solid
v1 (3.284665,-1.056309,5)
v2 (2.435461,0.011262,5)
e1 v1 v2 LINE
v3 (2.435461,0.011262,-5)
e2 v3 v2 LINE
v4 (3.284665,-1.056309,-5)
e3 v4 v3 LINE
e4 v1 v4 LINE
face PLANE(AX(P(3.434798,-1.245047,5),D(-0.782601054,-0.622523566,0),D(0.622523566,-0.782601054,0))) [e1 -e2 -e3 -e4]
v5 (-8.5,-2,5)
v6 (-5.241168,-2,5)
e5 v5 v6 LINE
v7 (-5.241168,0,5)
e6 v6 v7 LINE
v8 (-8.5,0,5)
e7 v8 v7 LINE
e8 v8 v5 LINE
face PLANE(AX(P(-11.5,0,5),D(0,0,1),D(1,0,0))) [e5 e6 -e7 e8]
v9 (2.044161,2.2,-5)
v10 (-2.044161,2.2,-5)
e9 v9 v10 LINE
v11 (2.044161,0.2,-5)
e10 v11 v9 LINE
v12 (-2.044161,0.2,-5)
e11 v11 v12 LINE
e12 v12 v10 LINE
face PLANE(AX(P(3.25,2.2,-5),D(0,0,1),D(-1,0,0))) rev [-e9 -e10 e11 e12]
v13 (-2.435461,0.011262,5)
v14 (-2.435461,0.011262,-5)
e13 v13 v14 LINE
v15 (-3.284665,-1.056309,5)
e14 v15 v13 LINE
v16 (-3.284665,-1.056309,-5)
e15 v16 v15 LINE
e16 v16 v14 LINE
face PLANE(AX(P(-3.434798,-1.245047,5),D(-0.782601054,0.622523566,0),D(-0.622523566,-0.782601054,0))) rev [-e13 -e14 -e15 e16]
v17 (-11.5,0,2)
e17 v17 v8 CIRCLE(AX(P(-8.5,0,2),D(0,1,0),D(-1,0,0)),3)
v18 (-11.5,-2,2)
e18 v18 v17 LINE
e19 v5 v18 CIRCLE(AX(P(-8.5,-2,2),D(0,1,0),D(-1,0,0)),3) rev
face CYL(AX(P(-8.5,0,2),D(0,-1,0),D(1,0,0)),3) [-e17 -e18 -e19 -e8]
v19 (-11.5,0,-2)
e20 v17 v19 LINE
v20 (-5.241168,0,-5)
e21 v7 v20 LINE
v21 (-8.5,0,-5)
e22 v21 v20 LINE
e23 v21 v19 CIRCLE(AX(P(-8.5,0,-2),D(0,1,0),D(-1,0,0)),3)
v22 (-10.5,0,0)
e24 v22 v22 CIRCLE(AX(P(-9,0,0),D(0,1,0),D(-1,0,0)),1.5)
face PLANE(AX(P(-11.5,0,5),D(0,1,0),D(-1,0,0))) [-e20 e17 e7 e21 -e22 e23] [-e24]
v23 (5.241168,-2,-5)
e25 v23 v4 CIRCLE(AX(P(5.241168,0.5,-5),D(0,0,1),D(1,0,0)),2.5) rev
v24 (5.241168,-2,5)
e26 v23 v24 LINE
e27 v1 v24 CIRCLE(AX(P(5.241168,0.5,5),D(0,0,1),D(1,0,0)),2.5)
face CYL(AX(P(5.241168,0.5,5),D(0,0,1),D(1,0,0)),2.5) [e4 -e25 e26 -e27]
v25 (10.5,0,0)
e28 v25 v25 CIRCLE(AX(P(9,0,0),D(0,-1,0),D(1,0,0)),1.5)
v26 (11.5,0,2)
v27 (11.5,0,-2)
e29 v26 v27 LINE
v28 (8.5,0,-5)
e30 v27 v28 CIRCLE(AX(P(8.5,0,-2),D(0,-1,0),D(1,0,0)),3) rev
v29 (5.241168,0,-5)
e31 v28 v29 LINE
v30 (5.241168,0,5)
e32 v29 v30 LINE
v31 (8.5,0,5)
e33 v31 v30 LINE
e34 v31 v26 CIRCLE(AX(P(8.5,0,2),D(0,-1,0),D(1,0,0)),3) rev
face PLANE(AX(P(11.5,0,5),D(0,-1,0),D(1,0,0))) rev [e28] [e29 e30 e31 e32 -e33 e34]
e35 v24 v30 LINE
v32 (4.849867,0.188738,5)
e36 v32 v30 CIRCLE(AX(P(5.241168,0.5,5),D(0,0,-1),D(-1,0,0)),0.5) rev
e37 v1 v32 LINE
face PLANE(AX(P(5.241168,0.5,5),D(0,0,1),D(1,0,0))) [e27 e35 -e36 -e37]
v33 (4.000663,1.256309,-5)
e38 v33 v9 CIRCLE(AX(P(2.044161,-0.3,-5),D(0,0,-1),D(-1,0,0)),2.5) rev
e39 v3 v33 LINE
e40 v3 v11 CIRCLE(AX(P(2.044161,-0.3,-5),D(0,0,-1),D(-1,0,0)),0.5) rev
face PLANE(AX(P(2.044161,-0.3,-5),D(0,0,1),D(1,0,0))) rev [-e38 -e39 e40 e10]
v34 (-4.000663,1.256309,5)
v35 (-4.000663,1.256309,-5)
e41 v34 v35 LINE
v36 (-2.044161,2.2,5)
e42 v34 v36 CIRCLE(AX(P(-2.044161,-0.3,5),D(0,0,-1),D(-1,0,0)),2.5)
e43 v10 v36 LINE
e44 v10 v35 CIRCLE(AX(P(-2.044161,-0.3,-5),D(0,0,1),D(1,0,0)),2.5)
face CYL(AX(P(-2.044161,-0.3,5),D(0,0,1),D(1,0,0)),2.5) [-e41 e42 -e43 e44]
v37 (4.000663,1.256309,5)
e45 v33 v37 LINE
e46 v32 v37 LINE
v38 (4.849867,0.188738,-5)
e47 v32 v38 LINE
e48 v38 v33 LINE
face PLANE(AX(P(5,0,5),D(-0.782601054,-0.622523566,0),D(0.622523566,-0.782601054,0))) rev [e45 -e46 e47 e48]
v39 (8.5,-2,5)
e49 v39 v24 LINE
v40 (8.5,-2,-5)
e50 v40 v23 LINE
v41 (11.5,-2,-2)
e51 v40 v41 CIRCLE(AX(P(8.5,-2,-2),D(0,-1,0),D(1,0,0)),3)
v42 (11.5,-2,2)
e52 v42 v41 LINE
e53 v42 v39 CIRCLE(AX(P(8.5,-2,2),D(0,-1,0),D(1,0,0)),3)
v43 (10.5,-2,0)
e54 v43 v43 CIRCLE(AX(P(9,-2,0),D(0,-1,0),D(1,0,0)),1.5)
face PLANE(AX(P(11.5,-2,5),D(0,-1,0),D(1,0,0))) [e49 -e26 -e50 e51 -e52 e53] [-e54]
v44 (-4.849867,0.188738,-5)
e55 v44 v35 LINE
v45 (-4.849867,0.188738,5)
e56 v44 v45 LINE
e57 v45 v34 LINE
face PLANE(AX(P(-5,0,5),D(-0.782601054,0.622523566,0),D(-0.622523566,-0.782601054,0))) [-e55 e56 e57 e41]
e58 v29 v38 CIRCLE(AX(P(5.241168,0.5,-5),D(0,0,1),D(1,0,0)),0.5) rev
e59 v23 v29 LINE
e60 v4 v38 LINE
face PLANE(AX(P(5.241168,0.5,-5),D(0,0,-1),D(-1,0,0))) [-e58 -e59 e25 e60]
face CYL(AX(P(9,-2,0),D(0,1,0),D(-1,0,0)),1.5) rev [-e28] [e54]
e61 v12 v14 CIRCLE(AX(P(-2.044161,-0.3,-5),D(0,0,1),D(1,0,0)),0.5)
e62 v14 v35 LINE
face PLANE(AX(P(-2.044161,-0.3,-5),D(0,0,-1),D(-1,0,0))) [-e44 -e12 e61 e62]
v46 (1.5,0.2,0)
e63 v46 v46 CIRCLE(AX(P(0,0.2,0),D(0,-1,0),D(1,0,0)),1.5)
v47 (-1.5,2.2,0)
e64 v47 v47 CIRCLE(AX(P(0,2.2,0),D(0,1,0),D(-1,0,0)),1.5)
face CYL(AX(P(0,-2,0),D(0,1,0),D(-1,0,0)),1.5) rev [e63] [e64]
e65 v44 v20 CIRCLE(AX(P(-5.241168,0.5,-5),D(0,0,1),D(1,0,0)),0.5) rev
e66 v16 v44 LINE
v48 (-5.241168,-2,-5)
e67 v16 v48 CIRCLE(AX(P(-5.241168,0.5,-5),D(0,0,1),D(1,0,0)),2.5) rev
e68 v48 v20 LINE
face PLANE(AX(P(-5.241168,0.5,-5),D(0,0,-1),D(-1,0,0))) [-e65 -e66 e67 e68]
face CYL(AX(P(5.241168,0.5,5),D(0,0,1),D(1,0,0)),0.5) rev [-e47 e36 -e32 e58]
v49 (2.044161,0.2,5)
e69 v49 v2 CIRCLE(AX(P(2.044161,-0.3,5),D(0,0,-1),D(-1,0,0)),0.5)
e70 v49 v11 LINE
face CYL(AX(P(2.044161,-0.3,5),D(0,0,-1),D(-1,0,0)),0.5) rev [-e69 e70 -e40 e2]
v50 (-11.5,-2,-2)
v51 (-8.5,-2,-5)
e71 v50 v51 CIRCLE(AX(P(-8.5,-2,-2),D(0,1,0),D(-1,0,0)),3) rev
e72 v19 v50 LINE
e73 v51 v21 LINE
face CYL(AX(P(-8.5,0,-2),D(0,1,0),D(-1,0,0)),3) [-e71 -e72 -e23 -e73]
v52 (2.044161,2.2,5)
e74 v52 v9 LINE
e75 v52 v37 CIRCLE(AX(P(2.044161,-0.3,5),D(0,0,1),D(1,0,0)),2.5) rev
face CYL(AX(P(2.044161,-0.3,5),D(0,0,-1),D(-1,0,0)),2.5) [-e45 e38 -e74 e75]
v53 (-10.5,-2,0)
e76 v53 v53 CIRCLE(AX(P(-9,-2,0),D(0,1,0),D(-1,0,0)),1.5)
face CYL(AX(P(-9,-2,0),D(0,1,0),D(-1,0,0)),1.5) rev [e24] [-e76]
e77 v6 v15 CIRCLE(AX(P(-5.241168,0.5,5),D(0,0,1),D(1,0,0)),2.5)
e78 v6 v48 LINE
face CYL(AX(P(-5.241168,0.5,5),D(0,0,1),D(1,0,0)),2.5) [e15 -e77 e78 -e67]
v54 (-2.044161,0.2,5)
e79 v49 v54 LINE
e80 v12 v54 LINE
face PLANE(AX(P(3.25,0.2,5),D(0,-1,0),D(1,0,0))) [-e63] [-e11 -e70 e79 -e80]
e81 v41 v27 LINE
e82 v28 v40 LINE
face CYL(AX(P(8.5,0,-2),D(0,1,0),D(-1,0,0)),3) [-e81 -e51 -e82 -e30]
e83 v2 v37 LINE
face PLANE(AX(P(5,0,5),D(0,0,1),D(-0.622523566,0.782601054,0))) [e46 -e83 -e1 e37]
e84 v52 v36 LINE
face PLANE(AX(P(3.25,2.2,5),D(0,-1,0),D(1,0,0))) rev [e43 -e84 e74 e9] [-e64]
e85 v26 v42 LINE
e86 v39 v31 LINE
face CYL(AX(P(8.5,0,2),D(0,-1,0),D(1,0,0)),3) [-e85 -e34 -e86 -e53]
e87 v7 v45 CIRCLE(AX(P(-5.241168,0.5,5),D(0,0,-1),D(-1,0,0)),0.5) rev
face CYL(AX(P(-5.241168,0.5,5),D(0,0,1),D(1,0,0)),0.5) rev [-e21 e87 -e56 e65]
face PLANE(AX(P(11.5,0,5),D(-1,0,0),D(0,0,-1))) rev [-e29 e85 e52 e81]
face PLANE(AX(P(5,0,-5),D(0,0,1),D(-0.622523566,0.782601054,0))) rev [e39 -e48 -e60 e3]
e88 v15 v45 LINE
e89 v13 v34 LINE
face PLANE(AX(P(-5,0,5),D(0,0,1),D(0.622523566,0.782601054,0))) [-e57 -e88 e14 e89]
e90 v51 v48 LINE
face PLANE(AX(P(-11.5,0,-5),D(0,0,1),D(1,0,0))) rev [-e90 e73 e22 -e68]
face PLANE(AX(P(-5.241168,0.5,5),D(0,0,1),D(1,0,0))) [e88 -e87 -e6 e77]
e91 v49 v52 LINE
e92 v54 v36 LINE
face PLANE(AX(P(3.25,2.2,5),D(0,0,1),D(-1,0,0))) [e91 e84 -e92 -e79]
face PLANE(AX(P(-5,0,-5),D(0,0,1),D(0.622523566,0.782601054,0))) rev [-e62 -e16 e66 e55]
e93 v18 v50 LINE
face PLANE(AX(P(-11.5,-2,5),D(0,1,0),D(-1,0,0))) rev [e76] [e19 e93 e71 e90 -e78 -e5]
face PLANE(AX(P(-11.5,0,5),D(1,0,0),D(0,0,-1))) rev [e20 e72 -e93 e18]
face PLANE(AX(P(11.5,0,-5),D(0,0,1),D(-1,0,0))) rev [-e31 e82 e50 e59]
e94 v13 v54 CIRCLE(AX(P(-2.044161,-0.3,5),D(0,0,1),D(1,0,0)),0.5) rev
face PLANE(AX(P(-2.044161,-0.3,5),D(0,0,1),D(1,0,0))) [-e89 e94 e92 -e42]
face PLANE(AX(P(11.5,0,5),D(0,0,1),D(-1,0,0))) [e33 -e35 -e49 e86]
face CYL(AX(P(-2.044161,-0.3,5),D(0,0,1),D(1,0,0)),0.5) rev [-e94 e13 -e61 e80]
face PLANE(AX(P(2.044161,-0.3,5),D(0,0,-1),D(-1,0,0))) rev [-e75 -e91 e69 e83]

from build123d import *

# Parameters (mm, degrees)
MAIN_BODY_DEPTH         = 5
CONVERT_SOLID1_START    = -5
CONVERT_SOLID1_DEPTH    = 10
CONVERT_SOLID1_2_DEPTH  = 10
SKETCH6_R               = 1.5
MIDDLE_RIVET_HOLE_DEPTH = 14.224598293
SKETCH7_R               = 1.5
LEFT_RIVET_HOLE_DEPTH   = 13.731457104
FILLET1_R               = 3


# Read off the part's stored shape, not the designer's step: Convert-Solid1
with BuildPart() as part:
    # Sketch1 → MAIN BODY (new, symmetric)
    with BuildSketch(Plane.XY):
        Polygon((11.5, 0), (5, 0), (3.25, 2.2), (0, 2.2), (0, 0.2), (2.285328582, 0.2), (4.035328582, -2), (11.5, -2), align=None)
    main_body = extrude(amount=MAIN_BODY_DEPTH, both=True)

    # Mirror1: MAIN BODY across plane
    add(main_body.mirror(Plane(origin=(0, 0, 0), x_dir=(0, 0, 1), z_dir=(1, 0, 0))))

    # Convert-Solid1 outline → Convert-Solid1 (cut)
    with BuildSketch(Plane.XY.offset(CONVERT_SOLID1_START)):
        with BuildLine():
            ThreePointArc((-4.000663363, 1.256308915), (-3.130261025, 1.951751794), (-2.044160728, 2.2))
            Line((-2.044160728, 2.2), (-3.25, 2.2))
            Line((-3.25, 2.2), (-4.000663363, 1.256308915))
        make_face()
        with BuildLine():
            ThreePointArc((2.044160728, 2.2), (3.130261025, 1.951751794), (4.000663363, 1.256308915))
            Line((4.000663363, 1.256308915), (3.25, 2.2))
            Line((3.25, 2.2), (2.044160728, 2.2))
        make_face()
        with BuildLine():
            Line((-4.035328582, -2), (-3.284665219, -1.056308915))
            ThreePointArc((-3.284665219, -1.056308915), (-4.155067557, -1.751751794), (-5.241167854, -2))
            Line((-5.241167854, -2), (-4.035328582, -2))
        make_face()
        with BuildLine():
            ThreePointArc((5.241167854, -2), (4.155067557, -1.751751794), (3.284665219, -1.056308915))
            Line((3.284665219, -1.056308915), (4.035328582, -2))
            Line((4.035328582, -2), (5.241167854, -2))
        make_face()
    extrude(amount=CONVERT_SOLID1_DEPTH, mode=Mode.SUBTRACT)

    # Convert-Solid1 2 outline → Convert-Solid1 2 (add)
    with BuildSketch(Plane.XY.offset(CONVERT_SOLID1_START)):
        with BuildLine():
            Line((-5, 0), (-4.849867327, 0.188738217))
            ThreePointArc((-4.849867327, 0.188738217), (-5.023947795, 0.049649641), (-5.241167854, 0))
            Line((-5.241167854, 0), (-5, 0))
        make_face()
        with BuildLine():
            ThreePointArc((5.241167854, 0), (5.023947795, 0.049649641), (4.849867327, 0.188738217))
            Line((4.849867327, 0.188738217), (5, 0))
            Line((5, 0), (5.241167854, 0))
        make_face()
        with BuildLine():
            ThreePointArc((-2.435461255, 0.011261783), (-2.261380788, 0.150350359), (-2.044160728, 0.2))
            Line((-2.044160728, 0.2), (-2.285328582, 0.2))
            Line((-2.285328582, 0.2), (-2.435461255, 0.011261783))
        make_face()
        with BuildLine():
            ThreePointArc((2.044160728, 0.2), (2.261380788, 0.150350359), (2.435461255, 0.011261783))
            Line((2.435461255, 0.011261783), (2.285328582, 0.2))
            Line((2.285328582, 0.2), (2.044160728, 0.2))
        make_face()
    extrude(amount=CONVERT_SOLID1_2_DEPTH)

    # Sketch6 → MIDDLE RIVET HOLE (cut, through all)
    with BuildSketch(Plane(origin=(0, 2.2, 0), x_dir=(1, 0, 0), z_dir=(0, 1, 0))):
        with Locations(Location((0, 0, 0), (0, 0, 180))):
            Circle(SKETCH6_R)
    extrude(amount=-MIDDLE_RIVET_HOLE_DEPTH, mode=Mode.SUBTRACT)

    # Sketch7 → LEFT RIVET HOLE (cut, through all)
    with BuildSketch(Plane(origin=(0, 0, 0), x_dir=(1, 0, 0), z_dir=(0, 1, 0))):
        with Locations(Location((-9, 0, 0), (0, 0, 180))):
            Circle(SKETCH7_R)
    left_rivet_hole = extrude(amount=-LEFT_RIVET_HOLE_DEPTH, mode=Mode.SUBTRACT)

    # RIGHT RIVET HOLE: LEFT RIVET HOLE across plane
    add(left_rivet_hole.mirror(Plane(origin=(0, 0, 0), x_dir=(0, 0, 1), z_dir=(1, 0, 0))), mode=Mode.SUBTRACT)

    # Fillet1
    fillet1_edges = [part.edges().sort_by_distance(p)[0] for p in [
        (11.5, -1, -5),
        (11.5, -1, 5),
        (-11.5, -1, 5),
        (-11.5, -1, -5),
    ]]
    fillet(fillet1_edges, radius=FILLET1_R)


solid = part.part
